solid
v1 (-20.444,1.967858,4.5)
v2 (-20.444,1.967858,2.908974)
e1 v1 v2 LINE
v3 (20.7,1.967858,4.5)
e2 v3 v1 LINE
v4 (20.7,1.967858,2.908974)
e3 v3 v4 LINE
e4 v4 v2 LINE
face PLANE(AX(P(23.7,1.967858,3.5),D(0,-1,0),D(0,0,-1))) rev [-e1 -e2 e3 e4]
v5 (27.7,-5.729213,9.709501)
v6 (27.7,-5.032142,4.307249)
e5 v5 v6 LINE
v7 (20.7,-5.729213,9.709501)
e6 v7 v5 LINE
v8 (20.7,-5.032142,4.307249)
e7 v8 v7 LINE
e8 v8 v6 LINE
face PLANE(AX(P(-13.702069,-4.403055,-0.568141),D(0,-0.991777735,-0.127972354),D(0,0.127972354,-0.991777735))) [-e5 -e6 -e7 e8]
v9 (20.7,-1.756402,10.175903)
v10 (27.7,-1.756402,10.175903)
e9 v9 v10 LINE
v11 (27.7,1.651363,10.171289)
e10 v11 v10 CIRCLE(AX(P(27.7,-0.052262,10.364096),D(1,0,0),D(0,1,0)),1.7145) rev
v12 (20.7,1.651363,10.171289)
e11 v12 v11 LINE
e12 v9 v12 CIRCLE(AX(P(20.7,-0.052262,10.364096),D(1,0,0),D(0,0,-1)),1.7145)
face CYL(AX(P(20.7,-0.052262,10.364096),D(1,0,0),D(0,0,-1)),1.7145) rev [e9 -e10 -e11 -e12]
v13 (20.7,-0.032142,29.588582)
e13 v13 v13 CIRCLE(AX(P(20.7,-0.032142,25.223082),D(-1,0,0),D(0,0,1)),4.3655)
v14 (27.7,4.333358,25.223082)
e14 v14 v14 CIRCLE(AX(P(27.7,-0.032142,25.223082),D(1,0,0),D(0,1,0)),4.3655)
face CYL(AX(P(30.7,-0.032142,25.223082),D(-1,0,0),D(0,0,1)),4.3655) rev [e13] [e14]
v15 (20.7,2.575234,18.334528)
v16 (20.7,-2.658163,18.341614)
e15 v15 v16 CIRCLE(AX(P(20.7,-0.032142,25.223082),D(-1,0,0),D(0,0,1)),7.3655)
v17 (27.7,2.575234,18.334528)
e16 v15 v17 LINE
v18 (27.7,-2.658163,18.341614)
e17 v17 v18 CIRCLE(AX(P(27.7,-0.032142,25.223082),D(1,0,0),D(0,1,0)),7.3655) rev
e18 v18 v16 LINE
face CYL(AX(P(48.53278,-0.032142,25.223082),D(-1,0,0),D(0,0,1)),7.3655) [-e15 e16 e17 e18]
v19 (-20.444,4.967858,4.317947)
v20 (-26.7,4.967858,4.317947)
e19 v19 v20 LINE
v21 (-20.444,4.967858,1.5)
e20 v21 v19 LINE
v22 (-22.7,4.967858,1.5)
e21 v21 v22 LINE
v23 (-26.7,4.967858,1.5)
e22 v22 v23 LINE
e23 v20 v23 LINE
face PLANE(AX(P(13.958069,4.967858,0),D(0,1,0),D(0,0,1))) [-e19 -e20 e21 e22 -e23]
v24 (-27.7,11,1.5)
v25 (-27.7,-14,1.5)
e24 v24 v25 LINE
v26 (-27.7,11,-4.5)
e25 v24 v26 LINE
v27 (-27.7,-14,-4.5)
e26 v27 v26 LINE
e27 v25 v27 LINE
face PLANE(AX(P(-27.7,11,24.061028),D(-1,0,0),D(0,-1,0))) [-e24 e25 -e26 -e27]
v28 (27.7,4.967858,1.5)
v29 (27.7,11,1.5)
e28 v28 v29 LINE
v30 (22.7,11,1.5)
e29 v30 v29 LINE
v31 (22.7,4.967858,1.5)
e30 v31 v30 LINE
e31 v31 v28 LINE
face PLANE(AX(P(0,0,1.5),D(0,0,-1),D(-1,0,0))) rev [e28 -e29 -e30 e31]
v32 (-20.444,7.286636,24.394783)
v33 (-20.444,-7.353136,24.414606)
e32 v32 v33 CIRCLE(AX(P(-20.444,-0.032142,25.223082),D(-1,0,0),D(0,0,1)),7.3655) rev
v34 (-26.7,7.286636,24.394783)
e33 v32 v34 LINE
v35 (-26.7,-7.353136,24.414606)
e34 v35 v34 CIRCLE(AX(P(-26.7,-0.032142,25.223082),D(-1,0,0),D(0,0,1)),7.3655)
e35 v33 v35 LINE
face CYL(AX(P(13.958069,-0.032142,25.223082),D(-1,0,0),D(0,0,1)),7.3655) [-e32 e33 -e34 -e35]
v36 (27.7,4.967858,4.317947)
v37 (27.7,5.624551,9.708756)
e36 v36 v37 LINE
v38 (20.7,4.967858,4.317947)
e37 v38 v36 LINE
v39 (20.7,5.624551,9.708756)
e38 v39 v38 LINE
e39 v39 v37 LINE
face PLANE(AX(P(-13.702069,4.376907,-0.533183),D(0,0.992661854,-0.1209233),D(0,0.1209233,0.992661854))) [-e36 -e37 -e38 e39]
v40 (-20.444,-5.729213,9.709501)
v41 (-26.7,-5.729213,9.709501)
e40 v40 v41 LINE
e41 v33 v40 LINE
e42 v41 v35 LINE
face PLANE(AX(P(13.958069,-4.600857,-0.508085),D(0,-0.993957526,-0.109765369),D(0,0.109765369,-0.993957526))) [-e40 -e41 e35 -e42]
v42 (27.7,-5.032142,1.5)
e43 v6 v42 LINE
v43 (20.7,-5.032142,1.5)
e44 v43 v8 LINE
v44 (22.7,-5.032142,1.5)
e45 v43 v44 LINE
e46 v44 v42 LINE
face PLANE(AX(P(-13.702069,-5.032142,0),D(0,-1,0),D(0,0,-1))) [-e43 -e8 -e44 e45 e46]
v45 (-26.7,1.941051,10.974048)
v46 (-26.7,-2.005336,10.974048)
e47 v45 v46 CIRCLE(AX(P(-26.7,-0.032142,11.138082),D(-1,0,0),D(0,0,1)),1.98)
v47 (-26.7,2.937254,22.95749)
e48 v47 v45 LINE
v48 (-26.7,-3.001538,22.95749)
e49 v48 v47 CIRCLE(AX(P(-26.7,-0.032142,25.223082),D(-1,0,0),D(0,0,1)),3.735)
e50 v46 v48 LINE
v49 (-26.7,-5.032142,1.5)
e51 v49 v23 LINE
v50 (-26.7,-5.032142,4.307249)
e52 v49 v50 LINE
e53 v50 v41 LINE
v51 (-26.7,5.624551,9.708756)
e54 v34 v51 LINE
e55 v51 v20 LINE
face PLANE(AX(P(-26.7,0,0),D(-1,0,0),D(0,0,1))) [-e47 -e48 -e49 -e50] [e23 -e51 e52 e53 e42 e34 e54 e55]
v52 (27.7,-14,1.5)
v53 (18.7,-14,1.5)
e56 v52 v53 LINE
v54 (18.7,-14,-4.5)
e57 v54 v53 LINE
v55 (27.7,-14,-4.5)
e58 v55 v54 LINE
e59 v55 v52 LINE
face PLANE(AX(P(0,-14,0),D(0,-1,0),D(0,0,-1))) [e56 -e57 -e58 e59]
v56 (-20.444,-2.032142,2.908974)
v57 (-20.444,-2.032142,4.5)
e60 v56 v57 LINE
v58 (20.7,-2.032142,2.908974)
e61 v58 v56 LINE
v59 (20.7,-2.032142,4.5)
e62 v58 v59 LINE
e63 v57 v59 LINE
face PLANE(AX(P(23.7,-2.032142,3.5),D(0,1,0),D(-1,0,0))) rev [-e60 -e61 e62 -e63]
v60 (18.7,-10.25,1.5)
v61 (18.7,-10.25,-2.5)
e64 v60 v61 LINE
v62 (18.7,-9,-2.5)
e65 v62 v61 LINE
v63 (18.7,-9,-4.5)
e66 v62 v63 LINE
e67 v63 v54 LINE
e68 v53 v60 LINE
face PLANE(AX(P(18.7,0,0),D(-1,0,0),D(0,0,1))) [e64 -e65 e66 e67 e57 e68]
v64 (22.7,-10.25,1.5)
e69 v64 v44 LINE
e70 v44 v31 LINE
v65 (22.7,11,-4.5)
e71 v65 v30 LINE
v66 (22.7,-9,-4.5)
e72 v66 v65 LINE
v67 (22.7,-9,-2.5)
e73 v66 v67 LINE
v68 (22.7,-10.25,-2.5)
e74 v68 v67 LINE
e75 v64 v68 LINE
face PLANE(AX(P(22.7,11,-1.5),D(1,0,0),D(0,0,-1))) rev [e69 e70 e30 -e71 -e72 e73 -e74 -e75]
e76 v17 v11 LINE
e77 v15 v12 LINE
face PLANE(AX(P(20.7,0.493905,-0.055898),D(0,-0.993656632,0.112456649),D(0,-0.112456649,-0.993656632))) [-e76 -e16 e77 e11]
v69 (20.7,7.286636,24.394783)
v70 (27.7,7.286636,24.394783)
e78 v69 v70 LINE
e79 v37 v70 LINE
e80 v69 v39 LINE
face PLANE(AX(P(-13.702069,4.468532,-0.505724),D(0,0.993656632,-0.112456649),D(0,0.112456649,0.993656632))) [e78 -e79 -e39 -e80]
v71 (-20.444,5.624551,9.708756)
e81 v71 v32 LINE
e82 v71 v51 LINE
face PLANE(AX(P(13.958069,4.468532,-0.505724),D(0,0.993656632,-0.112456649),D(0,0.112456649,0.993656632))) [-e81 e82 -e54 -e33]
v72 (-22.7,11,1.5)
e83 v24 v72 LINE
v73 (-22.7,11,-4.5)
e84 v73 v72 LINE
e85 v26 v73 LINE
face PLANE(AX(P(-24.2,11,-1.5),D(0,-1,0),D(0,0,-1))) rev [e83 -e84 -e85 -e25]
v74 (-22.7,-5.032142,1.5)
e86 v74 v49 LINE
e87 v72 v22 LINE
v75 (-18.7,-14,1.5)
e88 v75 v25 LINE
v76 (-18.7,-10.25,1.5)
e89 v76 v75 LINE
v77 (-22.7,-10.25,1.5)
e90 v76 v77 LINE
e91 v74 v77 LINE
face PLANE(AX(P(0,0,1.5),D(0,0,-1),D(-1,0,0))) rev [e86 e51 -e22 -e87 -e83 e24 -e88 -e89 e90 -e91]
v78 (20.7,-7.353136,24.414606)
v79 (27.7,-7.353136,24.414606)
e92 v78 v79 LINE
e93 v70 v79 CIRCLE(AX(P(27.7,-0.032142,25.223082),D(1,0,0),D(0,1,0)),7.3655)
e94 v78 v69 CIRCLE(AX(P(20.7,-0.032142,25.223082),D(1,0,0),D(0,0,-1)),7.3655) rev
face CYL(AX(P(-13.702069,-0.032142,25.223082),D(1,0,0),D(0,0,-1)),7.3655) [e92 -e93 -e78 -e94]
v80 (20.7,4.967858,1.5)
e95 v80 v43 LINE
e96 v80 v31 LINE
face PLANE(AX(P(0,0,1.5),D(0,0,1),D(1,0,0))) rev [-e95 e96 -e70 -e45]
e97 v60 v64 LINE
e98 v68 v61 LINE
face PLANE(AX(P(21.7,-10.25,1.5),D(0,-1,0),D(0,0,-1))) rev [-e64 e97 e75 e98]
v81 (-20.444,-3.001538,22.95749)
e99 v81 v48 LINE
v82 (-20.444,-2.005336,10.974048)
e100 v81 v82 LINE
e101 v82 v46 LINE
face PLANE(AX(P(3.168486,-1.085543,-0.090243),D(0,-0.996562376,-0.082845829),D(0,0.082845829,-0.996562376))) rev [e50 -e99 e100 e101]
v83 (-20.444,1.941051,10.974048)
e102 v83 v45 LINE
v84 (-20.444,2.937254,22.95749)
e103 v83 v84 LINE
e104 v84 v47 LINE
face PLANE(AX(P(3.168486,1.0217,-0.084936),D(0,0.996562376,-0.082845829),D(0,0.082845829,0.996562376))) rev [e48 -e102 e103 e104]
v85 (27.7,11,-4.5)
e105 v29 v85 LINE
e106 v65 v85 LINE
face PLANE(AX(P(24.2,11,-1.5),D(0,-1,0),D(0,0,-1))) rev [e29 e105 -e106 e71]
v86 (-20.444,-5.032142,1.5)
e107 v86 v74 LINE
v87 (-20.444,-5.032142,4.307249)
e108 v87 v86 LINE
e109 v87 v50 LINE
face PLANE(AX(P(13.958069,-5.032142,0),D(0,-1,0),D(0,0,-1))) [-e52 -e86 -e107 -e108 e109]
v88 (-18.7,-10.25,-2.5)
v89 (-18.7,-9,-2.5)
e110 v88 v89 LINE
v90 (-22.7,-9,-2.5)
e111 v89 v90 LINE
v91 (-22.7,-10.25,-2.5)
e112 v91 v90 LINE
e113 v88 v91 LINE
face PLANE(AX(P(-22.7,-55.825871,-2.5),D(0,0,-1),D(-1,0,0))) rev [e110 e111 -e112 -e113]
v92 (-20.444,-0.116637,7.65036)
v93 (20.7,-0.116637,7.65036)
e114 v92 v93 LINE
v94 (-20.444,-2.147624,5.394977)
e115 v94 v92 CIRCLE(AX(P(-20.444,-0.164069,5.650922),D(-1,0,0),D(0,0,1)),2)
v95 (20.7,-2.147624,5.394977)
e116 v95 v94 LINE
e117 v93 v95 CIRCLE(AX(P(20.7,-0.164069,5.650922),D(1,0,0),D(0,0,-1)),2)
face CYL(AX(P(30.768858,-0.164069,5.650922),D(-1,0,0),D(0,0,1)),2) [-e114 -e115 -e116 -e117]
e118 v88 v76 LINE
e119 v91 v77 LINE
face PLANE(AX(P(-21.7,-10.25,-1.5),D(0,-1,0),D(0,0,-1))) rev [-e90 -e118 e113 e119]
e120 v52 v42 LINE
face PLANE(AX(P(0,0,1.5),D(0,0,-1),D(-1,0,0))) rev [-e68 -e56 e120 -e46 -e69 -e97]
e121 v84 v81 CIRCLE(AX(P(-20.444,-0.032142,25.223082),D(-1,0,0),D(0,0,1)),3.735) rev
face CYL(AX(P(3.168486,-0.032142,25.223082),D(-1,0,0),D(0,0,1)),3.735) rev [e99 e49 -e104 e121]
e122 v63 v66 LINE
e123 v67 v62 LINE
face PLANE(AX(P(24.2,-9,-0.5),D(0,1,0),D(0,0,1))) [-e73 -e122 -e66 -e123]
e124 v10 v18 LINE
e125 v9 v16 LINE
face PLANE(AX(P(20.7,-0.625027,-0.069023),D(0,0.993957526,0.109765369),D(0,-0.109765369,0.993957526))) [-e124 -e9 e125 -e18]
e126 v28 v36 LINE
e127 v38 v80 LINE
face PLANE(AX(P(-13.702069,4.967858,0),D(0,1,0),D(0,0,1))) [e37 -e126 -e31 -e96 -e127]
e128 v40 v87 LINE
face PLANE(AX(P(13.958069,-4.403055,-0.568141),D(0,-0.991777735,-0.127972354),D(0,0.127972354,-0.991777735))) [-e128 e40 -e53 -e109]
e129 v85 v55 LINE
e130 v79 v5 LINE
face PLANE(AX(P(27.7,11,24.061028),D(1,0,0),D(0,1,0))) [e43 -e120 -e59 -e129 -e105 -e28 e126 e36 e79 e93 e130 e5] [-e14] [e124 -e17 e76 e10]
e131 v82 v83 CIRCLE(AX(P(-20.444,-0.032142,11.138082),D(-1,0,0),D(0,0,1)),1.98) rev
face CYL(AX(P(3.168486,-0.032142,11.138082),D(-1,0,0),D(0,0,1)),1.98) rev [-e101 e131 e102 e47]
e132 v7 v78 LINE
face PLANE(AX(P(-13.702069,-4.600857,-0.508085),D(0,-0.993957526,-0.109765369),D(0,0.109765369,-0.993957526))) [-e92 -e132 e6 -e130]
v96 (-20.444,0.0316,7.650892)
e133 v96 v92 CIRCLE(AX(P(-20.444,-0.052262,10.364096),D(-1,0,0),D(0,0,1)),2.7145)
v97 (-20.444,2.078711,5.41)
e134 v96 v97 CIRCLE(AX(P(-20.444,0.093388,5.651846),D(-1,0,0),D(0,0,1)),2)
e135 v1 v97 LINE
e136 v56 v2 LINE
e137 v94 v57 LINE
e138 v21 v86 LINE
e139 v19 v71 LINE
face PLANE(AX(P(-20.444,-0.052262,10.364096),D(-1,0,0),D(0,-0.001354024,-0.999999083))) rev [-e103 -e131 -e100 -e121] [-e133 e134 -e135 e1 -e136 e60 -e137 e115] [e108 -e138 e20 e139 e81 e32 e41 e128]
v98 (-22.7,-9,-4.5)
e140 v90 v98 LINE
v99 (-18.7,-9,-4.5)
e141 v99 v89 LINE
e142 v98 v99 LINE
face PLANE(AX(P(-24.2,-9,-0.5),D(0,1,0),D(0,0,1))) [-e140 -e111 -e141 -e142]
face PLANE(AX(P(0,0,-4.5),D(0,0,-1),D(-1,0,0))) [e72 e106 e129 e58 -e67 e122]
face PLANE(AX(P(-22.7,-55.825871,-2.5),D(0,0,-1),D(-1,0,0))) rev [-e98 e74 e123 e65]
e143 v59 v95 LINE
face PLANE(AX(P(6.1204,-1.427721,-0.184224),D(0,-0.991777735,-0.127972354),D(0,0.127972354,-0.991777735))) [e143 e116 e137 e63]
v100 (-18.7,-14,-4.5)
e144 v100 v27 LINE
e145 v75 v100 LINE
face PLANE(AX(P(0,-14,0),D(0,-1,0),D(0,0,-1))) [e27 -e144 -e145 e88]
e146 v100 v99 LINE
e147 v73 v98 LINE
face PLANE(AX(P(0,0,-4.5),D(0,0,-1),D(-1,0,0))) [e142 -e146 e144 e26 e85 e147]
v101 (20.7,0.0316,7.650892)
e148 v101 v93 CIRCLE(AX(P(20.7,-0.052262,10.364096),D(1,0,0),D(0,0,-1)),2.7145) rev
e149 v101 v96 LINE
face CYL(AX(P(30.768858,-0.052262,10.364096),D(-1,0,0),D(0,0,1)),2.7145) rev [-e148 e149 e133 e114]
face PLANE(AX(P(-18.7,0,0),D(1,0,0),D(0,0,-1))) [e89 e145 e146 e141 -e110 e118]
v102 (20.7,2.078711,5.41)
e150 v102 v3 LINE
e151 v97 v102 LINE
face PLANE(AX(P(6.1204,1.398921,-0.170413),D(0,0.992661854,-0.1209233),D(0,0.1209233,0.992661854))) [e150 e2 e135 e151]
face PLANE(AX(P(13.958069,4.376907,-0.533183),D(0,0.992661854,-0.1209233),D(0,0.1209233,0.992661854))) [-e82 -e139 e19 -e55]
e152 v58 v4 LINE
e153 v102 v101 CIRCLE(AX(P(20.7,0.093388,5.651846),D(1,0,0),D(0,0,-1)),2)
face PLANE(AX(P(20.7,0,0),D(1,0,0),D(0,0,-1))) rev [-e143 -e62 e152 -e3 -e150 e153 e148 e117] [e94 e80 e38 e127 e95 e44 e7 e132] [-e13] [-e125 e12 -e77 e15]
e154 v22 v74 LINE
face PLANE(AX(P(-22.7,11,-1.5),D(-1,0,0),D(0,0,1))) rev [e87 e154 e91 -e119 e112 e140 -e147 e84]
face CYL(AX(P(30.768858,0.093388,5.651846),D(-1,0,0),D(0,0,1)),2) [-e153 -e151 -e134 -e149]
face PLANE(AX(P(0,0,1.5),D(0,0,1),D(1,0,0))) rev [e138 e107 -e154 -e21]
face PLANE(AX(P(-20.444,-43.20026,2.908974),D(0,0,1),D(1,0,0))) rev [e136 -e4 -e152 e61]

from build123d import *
from build123d.topology import SkipClean

# Parameters (mm, degrees)
SKETCH1_W                   = 45
SKETCH1_H                   = 20.5
SKETCH1_R                   = 1.05
BOSS_EXTRUDE1_DEPTH         = 1.75
SKETCH3_W                   = 1.5
SKETCH3_H                   = 22
BOSS_EXTRUDE2_DEPTH         = 1.5
BOSS_EXTRUDE2_2_DEPTH       = 1.5
SKETCH4_W                   = 3
SKETCH4_H                   = 0.75
BOSS_EXTRUDE3_DEPTH         = 1
SKETCH5_W                   = 3
SKETCH5_H                   = 0.75
BOSS_EXTRUDE4_DEPTH         = 1
SKETCH6_W                   = 2.5
SKETCH6_H                   = 2
BOSS_EXTRUDE5_DEPTH         = 1
BODY_MOVE_COPY1_START       = 1.25
BODY_MOVE_COPY1_OUTLINE_W   = 45
BODY_MOVE_COPY1_OUTLINE_H   = 20.5
BODY_MOVE_COPY1_OUTLINE_R   = 1.05
BODY_MOVE_COPY1_DEPTH       = 0.5
BODY_MOVE_COPY1_START_2     = -0.5
BODY_MOVE_COPY1_2_OUTLINE_W = 45
BODY_MOVE_COPY1_2_OUTLINE_H = 20.5
BODY_MOVE_COPY1_2_OUTLINE_R = 1.05
BODY_MOVE_COPY1_2_DEPTH     = 0.5
SKETCH8_W                   = 1.5
SKETCH8_H                   = 4
BOSS_EXTRUDE7_DEPTH         = 2
SKETCH9_W                   = 47.4
SKETCH9_H                   = 4
BOSS_EXTRUDE8_DEPTH         = 1
BOSS_EXTRUDE9_DEPTH         = 3.256
BOSS_EXTRUDE10_DEPTH        = 3
SKETCH13_R                  = 4.3655
SKETCH13_R_2                = 3.3655
BOSS_EXTRUDE11_DEPTH        = 3
SKETCH16_R                  = 4.3655
SKETCH16_R_2                = 3.3655
BOSS_EXTRUDE12_DEPTH        = 3
SKETCH17_W                  = 5
SKETCH17_H                  = 22
BOSS_EXTRUDE13_DEPTH        = 3
BOSS_EXTRUDE14_START        = -44.4
BOSS_EXTRUDE14_OUTLINE_W    = 2
BOSS_EXTRUDE14_OUTLINE_H    = 4
BOSS_EXTRUDE14_DEPTH        = 42.9
FILLET1_R                   = 2
SKETCH20_W                  = 6
SKETCH20_H                  = 3
BOSS_EXTRUDE15_DEPTH        = 3
BOSS_EXTRUDE16_DEPTH        = 3
BOSS_EXTRUDE17_DEPTH        = 3
BOSS_EXTRUDE18_DEPTH        = 3
BOSS_EXTRUDE19_START        = -3.256
BOSS_EXTRUDE19_DEPTH        = 6.256
CUT_EXTRUDE1_DEPTH          = 6.256
BOSS_EXTRUDE21_START        = -3
SKETCH26_R                  = 3.3655
BOSS_EXTRUDE21_DEPTH        = 7
SKETCH27_R                  = 4.3655
SKETCH27_R_2                = 3.3655
CUT_EXTRUDE2_DEPTH          = 3
SKETCH28_R                  = 5.378785713
SKETCH28_R_2                = 3.3655
BOSS_EXTRUDE22_DEPTH        = 7
SKETCH29_R                  = 3.730648532
CUT_EXTRUDE3_DEPTH          = 7
SKETCH31_W                  = 45.4
SKETCH31_H                  = 4
CUT_EXTRUDE4_DEPTH          = 21.25
SKETCH32_W                  = 41.144
SKETCH32_H                  = 1.408973542
CUT_EXTRUDE5_DEPTH          = 13.032142153
SKETCH33_R                  = 4.3655
CUT_EXTRUDE6_DEPTH          = 10
SKETCH34_R                  = 7.3655
SKETCH34_R_2                = 4.3655
BOSS_EXTRUDE23_DEPTH        = 7
BOSS_EXTRUDE24_DEPTH        = 6.256


# Read off the part's stored shape, not the designer's step: Body-Move/Copy1, Boss-Extrude14
with BuildPart() as part:
    # Sketch1 → Boss-Extrude1 (new body)
    with BuildSketch(Plane.XY):
        Rectangle(SKETCH1_W, SKETCH1_H)
        with Locations((20.45, -8.2)):
            Circle(SKETCH1_R, mode=Mode.SUBTRACT)
        with Locations((-20.45, 8.2)):
            Circle(SKETCH1_R, mode=Mode.SUBTRACT)
    extrude(amount=BOSS_EXTRUDE1_DEPTH)

    # Body-Move/Copy1 outline → Body-Move/Copy1 (cut)
    with BuildSketch(Plane.XY.offset(BODY_MOVE_COPY1_START)):
        Rectangle(BODY_MOVE_COPY1_OUTLINE_W, BODY_MOVE_COPY1_OUTLINE_H)
        with Locations((20.45, -8.2)):
            Circle(BODY_MOVE_COPY1_OUTLINE_R, mode=Mode.SUBTRACT)
        with Locations((-20.45, 8.2)):
            Circle(BODY_MOVE_COPY1_OUTLINE_R, mode=Mode.SUBTRACT)
    extrude(amount=BODY_MOVE_COPY1_DEPTH, mode=Mode.SUBTRACT)

    # Body-Move_Copy1 2 outline → Body-Move_Copy1 2 (add)
    with BuildSketch(Plane.XY.offset(BODY_MOVE_COPY1_START_2)):
        Rectangle(BODY_MOVE_COPY1_2_OUTLINE_W, BODY_MOVE_COPY1_2_OUTLINE_H)
        with Locations((20.45, -8.2)):
            Circle(BODY_MOVE_COPY1_2_OUTLINE_R, mode=Mode.SUBTRACT)
        with Locations((-20.45, 8.2)):
            Circle(BODY_MOVE_COPY1_2_OUTLINE_R, mode=Mode.SUBTRACT)
    extrude(amount=BODY_MOVE_COPY1_2_DEPTH)


with BuildPart() as body_2:
    # Sketch3 → Boss-Extrude2 (new, symmetric)
    with BuildSketch(Plane(origin=(0, 0, 0), x_dir=(-1, 0, 0), z_dir=(0, 0, -1))):
        with Locations((-23.45, 0)):
            Rectangle(SKETCH3_W, SKETCH3_H)
    extrude(amount=BOSS_EXTRUDE2_DEPTH, both=True)

    # Sketch4 → Boss-Extrude3 (add)
    with BuildSketch(Plane.ZY.offset(-22.7)):
        with Locations((0, -10.625)):
            Rectangle(SKETCH4_W, SKETCH4_H)
    extrude(amount=BOSS_EXTRUDE3_DEPTH)



with BuildPart() as body_3:
    # Sketch3 → Boss-Extrude2 2 (new, symmetric)
    with BuildSketch(Plane(origin=(0, 0, 0), x_dir=(-1, 0, 0), z_dir=(0, 0, -1))):
        with Locations((23.45, 0)):
            Rectangle(SKETCH3_W, SKETCH3_H)
    extrude(amount=BOSS_EXTRUDE2_2_DEPTH, both=True)

    # Sketch5 → Boss-Extrude4 (add)
    with BuildSketch(Plane(origin=(-22.7, 0, 0), x_dir=(0, 0, -1), z_dir=(1, 0, 0))):
        with Locations((0, -10.625)):
            Rectangle(SKETCH5_W, SKETCH5_H)
    extrude(amount=BOSS_EXTRUDE4_DEPTH)


with BuildPart() as body_2_1:
    add(body_2.part)

    add(body_3.part)  # Boss-Extrude5 merges body 3
    # Sketch6 → Boss-Extrude5 (add)
    with BuildSketch(Plane(origin=(0, 0, -1.5), x_dir=(-1, 0, 0), z_dir=(0, 0, -1))):
        with Locations((-22.95, -10)):
            Rectangle(SKETCH6_W, SKETCH6_H)
        with Locations((22.95, -10)):
            Rectangle(SKETCH6_W, SKETCH6_H)
    extrude(amount=-BOSS_EXTRUDE5_DEPTH)

    # Sketch8 → Boss-Extrude7 (add)
    with BuildSketch(Plane.XY.offset(1.5)):
        with Locations((-22.95, -0.032142153)):
            Rectangle(SKETCH8_W, SKETCH8_H)
        with Locations((22.95, -0.032142153)):
            Rectangle(SKETCH8_W, SKETCH8_H)
    extrude(amount=BOSS_EXTRUDE7_DEPTH)

    # Sketch9 → Boss-Extrude8 (add)
    with BuildSketch(Plane.XY.offset(3.5)):
        with Locations((0, -0.032142153)):
            Rectangle(SKETCH9_W, SKETCH9_H)
    extrude(amount=BOSS_EXTRUDE8_DEPTH)

    # Sketch11 → Boss-Extrude9 (add)
    with BuildSketch(Plane.ZY.offset(23.7)):
        with BuildLine():
            Line((10.066137971, -2.750359304), (24.743901725, -4.371263733))
            ThreePointArc((24.743901725, -4.371263733), (29.588578443, -0.02623116), (24.732152942, 4.305665873))
            Line((24.732152942, 4.305665873), (10.058832491, 2.645019328))
            Line((10.058832491, 2.645019328), (4.5, 1.967857847))
            Line((4.5, 1.967857847), (4.5, -2.032142153))
            Line((4.5, -2.032142153), (10.066137971, -2.750359304))
        make_face()
        with BuildLine():
            ThreePointArc((24.853667095, -3.377306207), (28.588579359, -0.027585185), (24.844609591, 3.312009241))
            Line((24.844609591, 3.312009241), (10.17128914, 1.651362696))
            ThreePointArc((10.17128914, 1.651362696), (8.649597637, -0.054583074), (10.17590334, -1.756401778))
            Line((10.17590334, -1.756401778), (24.853667095, -3.377306207))
        make_face(mode=Mode.SUBTRACT)
    extrude(amount=-BOSS_EXTRUDE9_DEPTH)

    # Sketch12 → Boss-Extrude10 (add)
    with BuildSketch(Plane(origin=(23.7, 0, 0), x_dir=(0, 0, -1), z_dir=(1, 0, 0))):
        with BuildLine():
            Line((-24.732152942, 4.305665873), (-10.058832491, 2.645019328))
            Line((-10.058832491, 2.645019328), (-4.5, 1.967857847))
            Line((-4.5, 1.967857847), (-4.5, -2.032142153))
            Line((-4.5, -2.032142153), (-10.066137971, -2.750359304))
            Line((-10.066137971, -2.750359304), (-24.743901725, -4.371263733))
            ThreePointArc((-24.743901725, -4.371263733), (-29.588578443, -0.02623116), (-24.732152942, 4.305665873))
        make_face()
        with BuildLine():
            ThreePointArc((-10.17590334, -1.756401778), (-8.649597637, -0.054583074), (-10.17128914, 1.651362696))
            Line((-10.17128914, 1.651362696), (-24.844609591, 3.312009241))
            ThreePointArc((-24.844609591, 3.312009241), (-28.588579359, -0.027585185), (-24.853667095, -3.377306207))
            Line((-24.853667095, -3.377306207), (-10.17590334, -1.756401778))
        make_face(mode=Mode.SUBTRACT)
    extrude(amount=-BOSS_EXTRUDE10_DEPTH)

    # Sketch13 → Boss-Extrude11 (add)
    with BuildSketch(Plane(origin=(23.7, 0, 0), x_dir=(0, 0, -1), z_dir=(1, 0, 0))):
        with Locations((-25.223082444, -0.032142153)):
            Circle(SKETCH13_R)
        with Locations((-25.223082444, -0.032142153)):
            Circle(SKETCH13_R_2, mode=Mode.SUBTRACT)
    extrude(amount=-BOSS_EXTRUDE11_DEPTH)

    # Sketch16 → Boss-Extrude12 (add)
    with BuildSketch(Plane.ZY.offset(-20.7)):
        with Locations(Location((25.223082444, -0.032142153, 0), (0, 0, 136.019369677))):
            Circle(SKETCH16_R)
        with Locations(Location((25.223082444, -0.032142153, 0), (0, 0, 180))):
            Circle(SKETCH16_R_2, mode=Mode.SUBTRACT)
    extrude(amount=BOSS_EXTRUDE12_DEPTH)

    # Sketch17 → Boss-Extrude13 (add)
    with BuildSketch(Plane(origin=(0, 0, -1.5), x_dir=(-1, 0, 0), z_dir=(0, 0, -1))):
        with Locations((-25.2, 0)):
            Rectangle(SKETCH17_W, SKETCH17_H)
        with Locations((25.2, 0)):
            Rectangle(SKETCH17_W, SKETCH17_H)
    extrude(amount=-BOSS_EXTRUDE13_DEPTH)

    # Boss-Extrude14 outline → Boss-Extrude14 (add)
    with BuildSketch(Plane.ZY.offset(23.7).offset(BOSS_EXTRUDE14_START)):
        with Locations((2.5, -0.032142153)):
            Rectangle(BOSS_EXTRUDE14_OUTLINE_W, BOSS_EXTRUDE14_OUTLINE_H)
        with BuildLine():
            Line((10.012890898, 2.639422851), (4.5, 1.967857847))
            Line((4.5, 1.967857847), (4.5, -2.032142153))
            Line((4.5, -2.032142153), (9.967409055, -2.737619986))
            ThreePointArc((9.967409055, -2.737619986), (7.649693167, -0.029301759), (10.012890898, 2.639422851))
        make_face()
    extrude(amount=BOSS_EXTRUDE14_DEPTH)

    # Fillet1
    # the kernel refuses this fillet: 2 mm, written as the material it takes off along each edge
    with BuildSketch(Plane(origin=(20.7, -2.737619986, 9.967409055), x_dir=(0, 0.7492110038942702, -0.6623313911054948), z_dir=(-1, 0, 0))) as fillet1_piece_1:
        with BuildLine():
            CenterArc((4.787077901, 1.529415678), FILLET1_R, 131.16964068, 98.711366411)
            Line((3.47049653, 3.034943324), (0, 0))
            ThreePointArc((0, 0), (1.749161793, 0.638700571), (3.498323587, 0))
        make_face()
    extrude(amount=41.144, mode=Mode.SUBTRACT)
    with BuildSketch(Plane(origin=(20.7, 2.639422851, 10.012890898), x_dir=(0, -0.7411764808079845, -0.6713102295489705), z_dir=(-1, 0, 0))) as fillet1_piece_2:
        with BuildLine():
            CenterArc((4.814675065, -1.523124197), FILLET1_R, 130.397896763, 98.715764742)
            Line((3.505553923, -3.035143323), (0, 0))
            ThreePointArc((0, 0), (1.759245587, -0.647239684), (3.518491173, 0))
        make_face()
    extrude(amount=41.144, mode=Mode.SUBTRACT)

    # Sketch20 → Boss-Extrude15 (add)
    with BuildSketch(Plane.XZ.offset(11)):
        with Locations((-24.7, 0)):
            Rectangle(SKETCH20_W, SKETCH20_H)
        with Locations((24.7, 0)):
            Rectangle(SKETCH20_W, SKETCH20_H)
    extrude(amount=BOSS_EXTRUDE15_DEPTH)

    # Sketch21 → Boss-Extrude16 (add)
    with BuildSketch(Plane(origin=(0, 0, -1.5), x_dir=(-1, 0, 0), z_dir=(0, 0, -1))):
        Polygon((-21.7, -9), (-22.7, -9), (-22.7, 11), (-27.7, 11), (-27.7, -14), (-21.7, -14), align=None)
        Polygon((21.7, -9), (21.7, -14), (27.7, -14), (27.7, 11), (22.7, 11), (22.7, -9), align=None)
    extrude(amount=BOSS_EXTRUDE16_DEPTH)

    # Sketch22 → Boss-Extrude17 (add)
    with BuildSketch(Plane.ZY.offset(-21.7)):
        Polygon((1.5, -14), (1.5, -10.25), (-0.5, -10.25), (-0.5, -9), (-4.5, -9), (-4.5, -14), align=None)
    extrude(amount=BOSS_EXTRUDE17_DEPTH)

    # Sketch23 → Boss-Extrude18 (add)
    with BuildSketch(Plane(origin=(-21.7, 0, 0), x_dir=(0, 0, -1), z_dir=(1, 0, 0))):
        Polygon((-1.5, -10.25), (-1.5, -14), (4.5, -14), (4.5, -9), (0.5, -9), (0.5, -10.25), align=None)
    extrude(amount=BOSS_EXTRUDE18_DEPTH)

    # Sketch24 → Boss-Extrude19 (add)
    with SkipClean():  # the faces are left unmerged after this step: merging them gives an invalid solid
        with BuildSketch(Plane.ZY.offset(23.7).offset(BOSS_EXTRUDE19_START)):
            with BuildLine():
                Line((1.5, 4.967857847), (1.5, -5.032142153))
                Line((1.5, -5.032142153), (4.307249044, -5.032142153))
                Line((4.307249044, -5.032142153), (9.709501407, -5.729212603))
                Line((9.709501407, -5.729212603), (24.414605618, -7.353136312))
                ThreePointArc((24.414605618, -7.353136312), (32.588575693, -0.022169088), (24.394782994, 7.286635769))
                Line((24.394782994, 7.286635769), (9.708756206, 5.624551189))
                Line((9.708756206, 5.624551189), (4.317947084, 4.967857847))
                Line((4.317947084, 4.967857847), (1.5, 4.967857847))
            make_face()
            with BuildLine():
                Line((24.853667095, -3.377306207), (10.17590334, -1.756401778))
                ThreePointArc((10.17590334, -1.756401778), (8.649597637, -0.054583074), (10.17128914, 1.651362696))
                Line((10.17128914, 1.651362696), (24.844609591, 3.312009241))
                ThreePointArc((24.844609591, 3.312009241), (28.588579359, -0.027585185), (24.853667095, -3.377306207))
            make_face(mode=Mode.SUBTRACT)
        extrude(amount=BOSS_EXTRUDE19_DEPTH)

    # Sketch25 → Cut-Extrude1 (cut)
    with BuildSketch(Plane.ZY.offset(26.7)):
        with BuildLine():
            Line((24.732152942, 4.305665873), (10.058832491, 2.645019328))
            ThreePointArc((10.058832491, 2.645019328), (7.649598554, -0.055937098), (10.066137971, -2.750359304))
            Line((10.066137971, -2.750359304), (24.743901725, -4.371263733))
            ThreePointArc((24.743901725, -4.371263733), (29.588578443, -0.02623116), (24.732152942, 4.305665873))
        make_face()
        with BuildLine():
            ThreePointArc((10.17590334, -1.756401778), (8.649597637, -0.054583074), (10.17128914, 1.651362696))
            Line((10.17128914, 1.651362696), (24.844609591, 3.312009241))
            ThreePointArc((24.844609591, 3.312009241), (28.588579359, -0.027585185), (24.853667095, -3.377306207))
            Line((24.853667095, -3.377306207), (10.17590334, -1.756401778))
        make_face(mode=Mode.SUBTRACT)
    extrude(amount=-CUT_EXTRUDE1_DEPTH, mode=Mode.SUBTRACT)

    # Sketch26 → Boss-Extrude21 (add)
    with SkipClean():  # the faces are left unmerged after this step: merging them gives an invalid solid
        with BuildSketch(Plane(origin=(23.7, 0, 0), x_dir=(0, 0, -1), z_dir=(1, 0, 0)).offset(BOSS_EXTRUDE21_START)):
            with BuildLine():
                Line((-1.5, 4.967857847), (-4.317947084, 4.967857847))
                Line((-4.317947084, 4.967857847), (-9.708756206, 5.624551189))
                Line((-9.708756206, 5.624551189), (-24.394782994, 7.286635769))
                ThreePointArc((-24.394782994, 7.286635769), (-32.588575693, -0.022169088), (-24.414605618, -7.353136312))
                Line((-24.414605618, -7.353136312), (-9.709501407, -5.729212603))
                Line((-9.709501407, -5.729212603), (-4.307249044, -5.032142153))
                Line((-4.307249044, -5.032142153), (-1.5, -5.032142153))
                Line((-1.5, -5.032142153), (-1.5, 4.967857847))
            make_face()
            with BuildLine():
                ThreePointArc((-10.17128914, 1.651362696), (-8.649597637, -0.054583074), (-10.17590334, -1.756401778))
                Line((-10.17590334, -1.756401778), (-22.090000411, -3.072107156))
                ThreePointArc((-22.090000411, -3.072107156), (-20.857586446, -0.038053146), (-22.081779534, 2.999327173))
                Line((-22.081779534, 2.999327173), (-10.17128914, 1.651362696))
            make_face(mode=Mode.SUBTRACT)
            with Locations(Location((-25.223082444, -0.032142153, 0), (0, 0, 90))):
                Circle(SKETCH26_R, mode=Mode.SUBTRACT)
        extrude(amount=BOSS_EXTRUDE21_DEPTH)

    # Sketch27 → Cut-Extrude2 (cut)
    with SkipClean():  # the faces are left unmerged after this step: merging them gives an invalid solid
        with BuildSketch(Plane.ZY.offset(-17.7)):
            with Locations((25.223082444, -0.032142153)):
                Circle(SKETCH27_R)
            with Locations(Location((25.223082444, -0.032142153, 0), (0, 0, 180))):
                Circle(SKETCH27_R_2, mode=Mode.SUBTRACT)
        extrude(amount=-CUT_EXTRUDE2_DEPTH, mode=Mode.SUBTRACT)

    # Sketch28 → Boss-Extrude22 (add)
    with BuildSketch(Plane(origin=(27.7, 0, 0), x_dir=(0, 0, -1), z_dir=(1, 0, 0))):
        with Locations((-25.223082444, -0.032142153)):
            Circle(SKETCH28_R)
        with Locations((-25.223082444, -0.032142153)):
            Circle(SKETCH28_R_2, mode=Mode.SUBTRACT)
    extrude(amount=-BOSS_EXTRUDE22_DEPTH)

    # Sketch29 → Cut-Extrude3 (cut)
    with BuildSketch(Plane(origin=(27.7, 0, 0), x_dir=(0, 0, -1), z_dir=(1, 0, 0))):
        with Locations(Location((-25.223082444, -0.032142153, 0), (0, 0, 90))):
            Circle(SKETCH29_R)
    extrude(amount=-CUT_EXTRUDE3_DEPTH, mode=Mode.SUBTRACT)

    # Sketch31 → Cut-Extrude4 (cut)
    with BuildSketch(Plane(origin=(0, 11, 0), x_dir=(1, 0, 0), z_dir=(0, 1, 0))):
        with Locations((0, 0.5)):
            Rectangle(SKETCH31_W, SKETCH31_H)
    extrude(amount=-CUT_EXTRUDE4_DEPTH, mode=Mode.SUBTRACT)

    # Sketch32 → Cut-Extrude5 (cut)
    with BuildSketch(Plane(origin=(0, 11, 0), x_dir=(1, 0, 0), z_dir=(0, 1, 0))):
        with Locations((0.128, -2.204486771)):
            Rectangle(SKETCH32_W, SKETCH32_H)
    extrude(amount=-CUT_EXTRUDE5_DEPTH, mode=Mode.SUBTRACT)

    # Sketch33 → Cut-Extrude6 (cut)
    with BuildSketch(Plane.ZY.offset(-20.7)):
        with Locations((25.223082444, -0.032142153)):
            Circle(SKETCH33_R)
    extrude(amount=-CUT_EXTRUDE6_DEPTH, mode=Mode.SUBTRACT)

    # Sketch34 → Boss-Extrude23 (add)
    with BuildSketch(Plane.ZY.offset(-20.7)):
        with Locations((25.223082444, -0.032142153)):
            Circle(SKETCH34_R)
        with Locations((25.223082444, -0.032142153)):
            Circle(SKETCH34_R_2, mode=Mode.SUBTRACT)
    extrude(amount=-BOSS_EXTRUDE23_DEPTH)

    # Sketch35 → Boss-Extrude24 (add)
    with BuildSketch(Plane.ZY.offset(26.7)):
        with BuildLine():
            Line((10.058832491, 2.645019328), (24.732152942, 4.305665873))
            ThreePointArc((24.732152942, 4.305665873), (29.588578443, -0.02623116), (24.743901725, -4.371263733))
            Line((24.743901725, -4.371263733), (10.066137971, -2.750359304))
            ThreePointArc((10.066137971, -2.750359304), (7.649598554, -0.055937098), (10.058832491, 2.645019328))
        make_face()
        with BuildLine():
            ThreePointArc((22.957489609, -3.001538406), (28.958082444, -0.032142153), (22.957489609, 2.937254099))
            Line((22.957489609, 2.937254099), (10.974047703, 1.941051351))
            ThreePointArc((10.974047703, 1.941051351), (9.158082444, -0.032142153), (10.974047703, -2.005335657))
            Line((10.974047703, -2.005335657), (22.957489609, -3.001538406))
        make_face(mode=Mode.SUBTRACT)
    extrude(amount=-BOSS_EXTRUDE24_DEPTH)


solid = body_2_1.part
